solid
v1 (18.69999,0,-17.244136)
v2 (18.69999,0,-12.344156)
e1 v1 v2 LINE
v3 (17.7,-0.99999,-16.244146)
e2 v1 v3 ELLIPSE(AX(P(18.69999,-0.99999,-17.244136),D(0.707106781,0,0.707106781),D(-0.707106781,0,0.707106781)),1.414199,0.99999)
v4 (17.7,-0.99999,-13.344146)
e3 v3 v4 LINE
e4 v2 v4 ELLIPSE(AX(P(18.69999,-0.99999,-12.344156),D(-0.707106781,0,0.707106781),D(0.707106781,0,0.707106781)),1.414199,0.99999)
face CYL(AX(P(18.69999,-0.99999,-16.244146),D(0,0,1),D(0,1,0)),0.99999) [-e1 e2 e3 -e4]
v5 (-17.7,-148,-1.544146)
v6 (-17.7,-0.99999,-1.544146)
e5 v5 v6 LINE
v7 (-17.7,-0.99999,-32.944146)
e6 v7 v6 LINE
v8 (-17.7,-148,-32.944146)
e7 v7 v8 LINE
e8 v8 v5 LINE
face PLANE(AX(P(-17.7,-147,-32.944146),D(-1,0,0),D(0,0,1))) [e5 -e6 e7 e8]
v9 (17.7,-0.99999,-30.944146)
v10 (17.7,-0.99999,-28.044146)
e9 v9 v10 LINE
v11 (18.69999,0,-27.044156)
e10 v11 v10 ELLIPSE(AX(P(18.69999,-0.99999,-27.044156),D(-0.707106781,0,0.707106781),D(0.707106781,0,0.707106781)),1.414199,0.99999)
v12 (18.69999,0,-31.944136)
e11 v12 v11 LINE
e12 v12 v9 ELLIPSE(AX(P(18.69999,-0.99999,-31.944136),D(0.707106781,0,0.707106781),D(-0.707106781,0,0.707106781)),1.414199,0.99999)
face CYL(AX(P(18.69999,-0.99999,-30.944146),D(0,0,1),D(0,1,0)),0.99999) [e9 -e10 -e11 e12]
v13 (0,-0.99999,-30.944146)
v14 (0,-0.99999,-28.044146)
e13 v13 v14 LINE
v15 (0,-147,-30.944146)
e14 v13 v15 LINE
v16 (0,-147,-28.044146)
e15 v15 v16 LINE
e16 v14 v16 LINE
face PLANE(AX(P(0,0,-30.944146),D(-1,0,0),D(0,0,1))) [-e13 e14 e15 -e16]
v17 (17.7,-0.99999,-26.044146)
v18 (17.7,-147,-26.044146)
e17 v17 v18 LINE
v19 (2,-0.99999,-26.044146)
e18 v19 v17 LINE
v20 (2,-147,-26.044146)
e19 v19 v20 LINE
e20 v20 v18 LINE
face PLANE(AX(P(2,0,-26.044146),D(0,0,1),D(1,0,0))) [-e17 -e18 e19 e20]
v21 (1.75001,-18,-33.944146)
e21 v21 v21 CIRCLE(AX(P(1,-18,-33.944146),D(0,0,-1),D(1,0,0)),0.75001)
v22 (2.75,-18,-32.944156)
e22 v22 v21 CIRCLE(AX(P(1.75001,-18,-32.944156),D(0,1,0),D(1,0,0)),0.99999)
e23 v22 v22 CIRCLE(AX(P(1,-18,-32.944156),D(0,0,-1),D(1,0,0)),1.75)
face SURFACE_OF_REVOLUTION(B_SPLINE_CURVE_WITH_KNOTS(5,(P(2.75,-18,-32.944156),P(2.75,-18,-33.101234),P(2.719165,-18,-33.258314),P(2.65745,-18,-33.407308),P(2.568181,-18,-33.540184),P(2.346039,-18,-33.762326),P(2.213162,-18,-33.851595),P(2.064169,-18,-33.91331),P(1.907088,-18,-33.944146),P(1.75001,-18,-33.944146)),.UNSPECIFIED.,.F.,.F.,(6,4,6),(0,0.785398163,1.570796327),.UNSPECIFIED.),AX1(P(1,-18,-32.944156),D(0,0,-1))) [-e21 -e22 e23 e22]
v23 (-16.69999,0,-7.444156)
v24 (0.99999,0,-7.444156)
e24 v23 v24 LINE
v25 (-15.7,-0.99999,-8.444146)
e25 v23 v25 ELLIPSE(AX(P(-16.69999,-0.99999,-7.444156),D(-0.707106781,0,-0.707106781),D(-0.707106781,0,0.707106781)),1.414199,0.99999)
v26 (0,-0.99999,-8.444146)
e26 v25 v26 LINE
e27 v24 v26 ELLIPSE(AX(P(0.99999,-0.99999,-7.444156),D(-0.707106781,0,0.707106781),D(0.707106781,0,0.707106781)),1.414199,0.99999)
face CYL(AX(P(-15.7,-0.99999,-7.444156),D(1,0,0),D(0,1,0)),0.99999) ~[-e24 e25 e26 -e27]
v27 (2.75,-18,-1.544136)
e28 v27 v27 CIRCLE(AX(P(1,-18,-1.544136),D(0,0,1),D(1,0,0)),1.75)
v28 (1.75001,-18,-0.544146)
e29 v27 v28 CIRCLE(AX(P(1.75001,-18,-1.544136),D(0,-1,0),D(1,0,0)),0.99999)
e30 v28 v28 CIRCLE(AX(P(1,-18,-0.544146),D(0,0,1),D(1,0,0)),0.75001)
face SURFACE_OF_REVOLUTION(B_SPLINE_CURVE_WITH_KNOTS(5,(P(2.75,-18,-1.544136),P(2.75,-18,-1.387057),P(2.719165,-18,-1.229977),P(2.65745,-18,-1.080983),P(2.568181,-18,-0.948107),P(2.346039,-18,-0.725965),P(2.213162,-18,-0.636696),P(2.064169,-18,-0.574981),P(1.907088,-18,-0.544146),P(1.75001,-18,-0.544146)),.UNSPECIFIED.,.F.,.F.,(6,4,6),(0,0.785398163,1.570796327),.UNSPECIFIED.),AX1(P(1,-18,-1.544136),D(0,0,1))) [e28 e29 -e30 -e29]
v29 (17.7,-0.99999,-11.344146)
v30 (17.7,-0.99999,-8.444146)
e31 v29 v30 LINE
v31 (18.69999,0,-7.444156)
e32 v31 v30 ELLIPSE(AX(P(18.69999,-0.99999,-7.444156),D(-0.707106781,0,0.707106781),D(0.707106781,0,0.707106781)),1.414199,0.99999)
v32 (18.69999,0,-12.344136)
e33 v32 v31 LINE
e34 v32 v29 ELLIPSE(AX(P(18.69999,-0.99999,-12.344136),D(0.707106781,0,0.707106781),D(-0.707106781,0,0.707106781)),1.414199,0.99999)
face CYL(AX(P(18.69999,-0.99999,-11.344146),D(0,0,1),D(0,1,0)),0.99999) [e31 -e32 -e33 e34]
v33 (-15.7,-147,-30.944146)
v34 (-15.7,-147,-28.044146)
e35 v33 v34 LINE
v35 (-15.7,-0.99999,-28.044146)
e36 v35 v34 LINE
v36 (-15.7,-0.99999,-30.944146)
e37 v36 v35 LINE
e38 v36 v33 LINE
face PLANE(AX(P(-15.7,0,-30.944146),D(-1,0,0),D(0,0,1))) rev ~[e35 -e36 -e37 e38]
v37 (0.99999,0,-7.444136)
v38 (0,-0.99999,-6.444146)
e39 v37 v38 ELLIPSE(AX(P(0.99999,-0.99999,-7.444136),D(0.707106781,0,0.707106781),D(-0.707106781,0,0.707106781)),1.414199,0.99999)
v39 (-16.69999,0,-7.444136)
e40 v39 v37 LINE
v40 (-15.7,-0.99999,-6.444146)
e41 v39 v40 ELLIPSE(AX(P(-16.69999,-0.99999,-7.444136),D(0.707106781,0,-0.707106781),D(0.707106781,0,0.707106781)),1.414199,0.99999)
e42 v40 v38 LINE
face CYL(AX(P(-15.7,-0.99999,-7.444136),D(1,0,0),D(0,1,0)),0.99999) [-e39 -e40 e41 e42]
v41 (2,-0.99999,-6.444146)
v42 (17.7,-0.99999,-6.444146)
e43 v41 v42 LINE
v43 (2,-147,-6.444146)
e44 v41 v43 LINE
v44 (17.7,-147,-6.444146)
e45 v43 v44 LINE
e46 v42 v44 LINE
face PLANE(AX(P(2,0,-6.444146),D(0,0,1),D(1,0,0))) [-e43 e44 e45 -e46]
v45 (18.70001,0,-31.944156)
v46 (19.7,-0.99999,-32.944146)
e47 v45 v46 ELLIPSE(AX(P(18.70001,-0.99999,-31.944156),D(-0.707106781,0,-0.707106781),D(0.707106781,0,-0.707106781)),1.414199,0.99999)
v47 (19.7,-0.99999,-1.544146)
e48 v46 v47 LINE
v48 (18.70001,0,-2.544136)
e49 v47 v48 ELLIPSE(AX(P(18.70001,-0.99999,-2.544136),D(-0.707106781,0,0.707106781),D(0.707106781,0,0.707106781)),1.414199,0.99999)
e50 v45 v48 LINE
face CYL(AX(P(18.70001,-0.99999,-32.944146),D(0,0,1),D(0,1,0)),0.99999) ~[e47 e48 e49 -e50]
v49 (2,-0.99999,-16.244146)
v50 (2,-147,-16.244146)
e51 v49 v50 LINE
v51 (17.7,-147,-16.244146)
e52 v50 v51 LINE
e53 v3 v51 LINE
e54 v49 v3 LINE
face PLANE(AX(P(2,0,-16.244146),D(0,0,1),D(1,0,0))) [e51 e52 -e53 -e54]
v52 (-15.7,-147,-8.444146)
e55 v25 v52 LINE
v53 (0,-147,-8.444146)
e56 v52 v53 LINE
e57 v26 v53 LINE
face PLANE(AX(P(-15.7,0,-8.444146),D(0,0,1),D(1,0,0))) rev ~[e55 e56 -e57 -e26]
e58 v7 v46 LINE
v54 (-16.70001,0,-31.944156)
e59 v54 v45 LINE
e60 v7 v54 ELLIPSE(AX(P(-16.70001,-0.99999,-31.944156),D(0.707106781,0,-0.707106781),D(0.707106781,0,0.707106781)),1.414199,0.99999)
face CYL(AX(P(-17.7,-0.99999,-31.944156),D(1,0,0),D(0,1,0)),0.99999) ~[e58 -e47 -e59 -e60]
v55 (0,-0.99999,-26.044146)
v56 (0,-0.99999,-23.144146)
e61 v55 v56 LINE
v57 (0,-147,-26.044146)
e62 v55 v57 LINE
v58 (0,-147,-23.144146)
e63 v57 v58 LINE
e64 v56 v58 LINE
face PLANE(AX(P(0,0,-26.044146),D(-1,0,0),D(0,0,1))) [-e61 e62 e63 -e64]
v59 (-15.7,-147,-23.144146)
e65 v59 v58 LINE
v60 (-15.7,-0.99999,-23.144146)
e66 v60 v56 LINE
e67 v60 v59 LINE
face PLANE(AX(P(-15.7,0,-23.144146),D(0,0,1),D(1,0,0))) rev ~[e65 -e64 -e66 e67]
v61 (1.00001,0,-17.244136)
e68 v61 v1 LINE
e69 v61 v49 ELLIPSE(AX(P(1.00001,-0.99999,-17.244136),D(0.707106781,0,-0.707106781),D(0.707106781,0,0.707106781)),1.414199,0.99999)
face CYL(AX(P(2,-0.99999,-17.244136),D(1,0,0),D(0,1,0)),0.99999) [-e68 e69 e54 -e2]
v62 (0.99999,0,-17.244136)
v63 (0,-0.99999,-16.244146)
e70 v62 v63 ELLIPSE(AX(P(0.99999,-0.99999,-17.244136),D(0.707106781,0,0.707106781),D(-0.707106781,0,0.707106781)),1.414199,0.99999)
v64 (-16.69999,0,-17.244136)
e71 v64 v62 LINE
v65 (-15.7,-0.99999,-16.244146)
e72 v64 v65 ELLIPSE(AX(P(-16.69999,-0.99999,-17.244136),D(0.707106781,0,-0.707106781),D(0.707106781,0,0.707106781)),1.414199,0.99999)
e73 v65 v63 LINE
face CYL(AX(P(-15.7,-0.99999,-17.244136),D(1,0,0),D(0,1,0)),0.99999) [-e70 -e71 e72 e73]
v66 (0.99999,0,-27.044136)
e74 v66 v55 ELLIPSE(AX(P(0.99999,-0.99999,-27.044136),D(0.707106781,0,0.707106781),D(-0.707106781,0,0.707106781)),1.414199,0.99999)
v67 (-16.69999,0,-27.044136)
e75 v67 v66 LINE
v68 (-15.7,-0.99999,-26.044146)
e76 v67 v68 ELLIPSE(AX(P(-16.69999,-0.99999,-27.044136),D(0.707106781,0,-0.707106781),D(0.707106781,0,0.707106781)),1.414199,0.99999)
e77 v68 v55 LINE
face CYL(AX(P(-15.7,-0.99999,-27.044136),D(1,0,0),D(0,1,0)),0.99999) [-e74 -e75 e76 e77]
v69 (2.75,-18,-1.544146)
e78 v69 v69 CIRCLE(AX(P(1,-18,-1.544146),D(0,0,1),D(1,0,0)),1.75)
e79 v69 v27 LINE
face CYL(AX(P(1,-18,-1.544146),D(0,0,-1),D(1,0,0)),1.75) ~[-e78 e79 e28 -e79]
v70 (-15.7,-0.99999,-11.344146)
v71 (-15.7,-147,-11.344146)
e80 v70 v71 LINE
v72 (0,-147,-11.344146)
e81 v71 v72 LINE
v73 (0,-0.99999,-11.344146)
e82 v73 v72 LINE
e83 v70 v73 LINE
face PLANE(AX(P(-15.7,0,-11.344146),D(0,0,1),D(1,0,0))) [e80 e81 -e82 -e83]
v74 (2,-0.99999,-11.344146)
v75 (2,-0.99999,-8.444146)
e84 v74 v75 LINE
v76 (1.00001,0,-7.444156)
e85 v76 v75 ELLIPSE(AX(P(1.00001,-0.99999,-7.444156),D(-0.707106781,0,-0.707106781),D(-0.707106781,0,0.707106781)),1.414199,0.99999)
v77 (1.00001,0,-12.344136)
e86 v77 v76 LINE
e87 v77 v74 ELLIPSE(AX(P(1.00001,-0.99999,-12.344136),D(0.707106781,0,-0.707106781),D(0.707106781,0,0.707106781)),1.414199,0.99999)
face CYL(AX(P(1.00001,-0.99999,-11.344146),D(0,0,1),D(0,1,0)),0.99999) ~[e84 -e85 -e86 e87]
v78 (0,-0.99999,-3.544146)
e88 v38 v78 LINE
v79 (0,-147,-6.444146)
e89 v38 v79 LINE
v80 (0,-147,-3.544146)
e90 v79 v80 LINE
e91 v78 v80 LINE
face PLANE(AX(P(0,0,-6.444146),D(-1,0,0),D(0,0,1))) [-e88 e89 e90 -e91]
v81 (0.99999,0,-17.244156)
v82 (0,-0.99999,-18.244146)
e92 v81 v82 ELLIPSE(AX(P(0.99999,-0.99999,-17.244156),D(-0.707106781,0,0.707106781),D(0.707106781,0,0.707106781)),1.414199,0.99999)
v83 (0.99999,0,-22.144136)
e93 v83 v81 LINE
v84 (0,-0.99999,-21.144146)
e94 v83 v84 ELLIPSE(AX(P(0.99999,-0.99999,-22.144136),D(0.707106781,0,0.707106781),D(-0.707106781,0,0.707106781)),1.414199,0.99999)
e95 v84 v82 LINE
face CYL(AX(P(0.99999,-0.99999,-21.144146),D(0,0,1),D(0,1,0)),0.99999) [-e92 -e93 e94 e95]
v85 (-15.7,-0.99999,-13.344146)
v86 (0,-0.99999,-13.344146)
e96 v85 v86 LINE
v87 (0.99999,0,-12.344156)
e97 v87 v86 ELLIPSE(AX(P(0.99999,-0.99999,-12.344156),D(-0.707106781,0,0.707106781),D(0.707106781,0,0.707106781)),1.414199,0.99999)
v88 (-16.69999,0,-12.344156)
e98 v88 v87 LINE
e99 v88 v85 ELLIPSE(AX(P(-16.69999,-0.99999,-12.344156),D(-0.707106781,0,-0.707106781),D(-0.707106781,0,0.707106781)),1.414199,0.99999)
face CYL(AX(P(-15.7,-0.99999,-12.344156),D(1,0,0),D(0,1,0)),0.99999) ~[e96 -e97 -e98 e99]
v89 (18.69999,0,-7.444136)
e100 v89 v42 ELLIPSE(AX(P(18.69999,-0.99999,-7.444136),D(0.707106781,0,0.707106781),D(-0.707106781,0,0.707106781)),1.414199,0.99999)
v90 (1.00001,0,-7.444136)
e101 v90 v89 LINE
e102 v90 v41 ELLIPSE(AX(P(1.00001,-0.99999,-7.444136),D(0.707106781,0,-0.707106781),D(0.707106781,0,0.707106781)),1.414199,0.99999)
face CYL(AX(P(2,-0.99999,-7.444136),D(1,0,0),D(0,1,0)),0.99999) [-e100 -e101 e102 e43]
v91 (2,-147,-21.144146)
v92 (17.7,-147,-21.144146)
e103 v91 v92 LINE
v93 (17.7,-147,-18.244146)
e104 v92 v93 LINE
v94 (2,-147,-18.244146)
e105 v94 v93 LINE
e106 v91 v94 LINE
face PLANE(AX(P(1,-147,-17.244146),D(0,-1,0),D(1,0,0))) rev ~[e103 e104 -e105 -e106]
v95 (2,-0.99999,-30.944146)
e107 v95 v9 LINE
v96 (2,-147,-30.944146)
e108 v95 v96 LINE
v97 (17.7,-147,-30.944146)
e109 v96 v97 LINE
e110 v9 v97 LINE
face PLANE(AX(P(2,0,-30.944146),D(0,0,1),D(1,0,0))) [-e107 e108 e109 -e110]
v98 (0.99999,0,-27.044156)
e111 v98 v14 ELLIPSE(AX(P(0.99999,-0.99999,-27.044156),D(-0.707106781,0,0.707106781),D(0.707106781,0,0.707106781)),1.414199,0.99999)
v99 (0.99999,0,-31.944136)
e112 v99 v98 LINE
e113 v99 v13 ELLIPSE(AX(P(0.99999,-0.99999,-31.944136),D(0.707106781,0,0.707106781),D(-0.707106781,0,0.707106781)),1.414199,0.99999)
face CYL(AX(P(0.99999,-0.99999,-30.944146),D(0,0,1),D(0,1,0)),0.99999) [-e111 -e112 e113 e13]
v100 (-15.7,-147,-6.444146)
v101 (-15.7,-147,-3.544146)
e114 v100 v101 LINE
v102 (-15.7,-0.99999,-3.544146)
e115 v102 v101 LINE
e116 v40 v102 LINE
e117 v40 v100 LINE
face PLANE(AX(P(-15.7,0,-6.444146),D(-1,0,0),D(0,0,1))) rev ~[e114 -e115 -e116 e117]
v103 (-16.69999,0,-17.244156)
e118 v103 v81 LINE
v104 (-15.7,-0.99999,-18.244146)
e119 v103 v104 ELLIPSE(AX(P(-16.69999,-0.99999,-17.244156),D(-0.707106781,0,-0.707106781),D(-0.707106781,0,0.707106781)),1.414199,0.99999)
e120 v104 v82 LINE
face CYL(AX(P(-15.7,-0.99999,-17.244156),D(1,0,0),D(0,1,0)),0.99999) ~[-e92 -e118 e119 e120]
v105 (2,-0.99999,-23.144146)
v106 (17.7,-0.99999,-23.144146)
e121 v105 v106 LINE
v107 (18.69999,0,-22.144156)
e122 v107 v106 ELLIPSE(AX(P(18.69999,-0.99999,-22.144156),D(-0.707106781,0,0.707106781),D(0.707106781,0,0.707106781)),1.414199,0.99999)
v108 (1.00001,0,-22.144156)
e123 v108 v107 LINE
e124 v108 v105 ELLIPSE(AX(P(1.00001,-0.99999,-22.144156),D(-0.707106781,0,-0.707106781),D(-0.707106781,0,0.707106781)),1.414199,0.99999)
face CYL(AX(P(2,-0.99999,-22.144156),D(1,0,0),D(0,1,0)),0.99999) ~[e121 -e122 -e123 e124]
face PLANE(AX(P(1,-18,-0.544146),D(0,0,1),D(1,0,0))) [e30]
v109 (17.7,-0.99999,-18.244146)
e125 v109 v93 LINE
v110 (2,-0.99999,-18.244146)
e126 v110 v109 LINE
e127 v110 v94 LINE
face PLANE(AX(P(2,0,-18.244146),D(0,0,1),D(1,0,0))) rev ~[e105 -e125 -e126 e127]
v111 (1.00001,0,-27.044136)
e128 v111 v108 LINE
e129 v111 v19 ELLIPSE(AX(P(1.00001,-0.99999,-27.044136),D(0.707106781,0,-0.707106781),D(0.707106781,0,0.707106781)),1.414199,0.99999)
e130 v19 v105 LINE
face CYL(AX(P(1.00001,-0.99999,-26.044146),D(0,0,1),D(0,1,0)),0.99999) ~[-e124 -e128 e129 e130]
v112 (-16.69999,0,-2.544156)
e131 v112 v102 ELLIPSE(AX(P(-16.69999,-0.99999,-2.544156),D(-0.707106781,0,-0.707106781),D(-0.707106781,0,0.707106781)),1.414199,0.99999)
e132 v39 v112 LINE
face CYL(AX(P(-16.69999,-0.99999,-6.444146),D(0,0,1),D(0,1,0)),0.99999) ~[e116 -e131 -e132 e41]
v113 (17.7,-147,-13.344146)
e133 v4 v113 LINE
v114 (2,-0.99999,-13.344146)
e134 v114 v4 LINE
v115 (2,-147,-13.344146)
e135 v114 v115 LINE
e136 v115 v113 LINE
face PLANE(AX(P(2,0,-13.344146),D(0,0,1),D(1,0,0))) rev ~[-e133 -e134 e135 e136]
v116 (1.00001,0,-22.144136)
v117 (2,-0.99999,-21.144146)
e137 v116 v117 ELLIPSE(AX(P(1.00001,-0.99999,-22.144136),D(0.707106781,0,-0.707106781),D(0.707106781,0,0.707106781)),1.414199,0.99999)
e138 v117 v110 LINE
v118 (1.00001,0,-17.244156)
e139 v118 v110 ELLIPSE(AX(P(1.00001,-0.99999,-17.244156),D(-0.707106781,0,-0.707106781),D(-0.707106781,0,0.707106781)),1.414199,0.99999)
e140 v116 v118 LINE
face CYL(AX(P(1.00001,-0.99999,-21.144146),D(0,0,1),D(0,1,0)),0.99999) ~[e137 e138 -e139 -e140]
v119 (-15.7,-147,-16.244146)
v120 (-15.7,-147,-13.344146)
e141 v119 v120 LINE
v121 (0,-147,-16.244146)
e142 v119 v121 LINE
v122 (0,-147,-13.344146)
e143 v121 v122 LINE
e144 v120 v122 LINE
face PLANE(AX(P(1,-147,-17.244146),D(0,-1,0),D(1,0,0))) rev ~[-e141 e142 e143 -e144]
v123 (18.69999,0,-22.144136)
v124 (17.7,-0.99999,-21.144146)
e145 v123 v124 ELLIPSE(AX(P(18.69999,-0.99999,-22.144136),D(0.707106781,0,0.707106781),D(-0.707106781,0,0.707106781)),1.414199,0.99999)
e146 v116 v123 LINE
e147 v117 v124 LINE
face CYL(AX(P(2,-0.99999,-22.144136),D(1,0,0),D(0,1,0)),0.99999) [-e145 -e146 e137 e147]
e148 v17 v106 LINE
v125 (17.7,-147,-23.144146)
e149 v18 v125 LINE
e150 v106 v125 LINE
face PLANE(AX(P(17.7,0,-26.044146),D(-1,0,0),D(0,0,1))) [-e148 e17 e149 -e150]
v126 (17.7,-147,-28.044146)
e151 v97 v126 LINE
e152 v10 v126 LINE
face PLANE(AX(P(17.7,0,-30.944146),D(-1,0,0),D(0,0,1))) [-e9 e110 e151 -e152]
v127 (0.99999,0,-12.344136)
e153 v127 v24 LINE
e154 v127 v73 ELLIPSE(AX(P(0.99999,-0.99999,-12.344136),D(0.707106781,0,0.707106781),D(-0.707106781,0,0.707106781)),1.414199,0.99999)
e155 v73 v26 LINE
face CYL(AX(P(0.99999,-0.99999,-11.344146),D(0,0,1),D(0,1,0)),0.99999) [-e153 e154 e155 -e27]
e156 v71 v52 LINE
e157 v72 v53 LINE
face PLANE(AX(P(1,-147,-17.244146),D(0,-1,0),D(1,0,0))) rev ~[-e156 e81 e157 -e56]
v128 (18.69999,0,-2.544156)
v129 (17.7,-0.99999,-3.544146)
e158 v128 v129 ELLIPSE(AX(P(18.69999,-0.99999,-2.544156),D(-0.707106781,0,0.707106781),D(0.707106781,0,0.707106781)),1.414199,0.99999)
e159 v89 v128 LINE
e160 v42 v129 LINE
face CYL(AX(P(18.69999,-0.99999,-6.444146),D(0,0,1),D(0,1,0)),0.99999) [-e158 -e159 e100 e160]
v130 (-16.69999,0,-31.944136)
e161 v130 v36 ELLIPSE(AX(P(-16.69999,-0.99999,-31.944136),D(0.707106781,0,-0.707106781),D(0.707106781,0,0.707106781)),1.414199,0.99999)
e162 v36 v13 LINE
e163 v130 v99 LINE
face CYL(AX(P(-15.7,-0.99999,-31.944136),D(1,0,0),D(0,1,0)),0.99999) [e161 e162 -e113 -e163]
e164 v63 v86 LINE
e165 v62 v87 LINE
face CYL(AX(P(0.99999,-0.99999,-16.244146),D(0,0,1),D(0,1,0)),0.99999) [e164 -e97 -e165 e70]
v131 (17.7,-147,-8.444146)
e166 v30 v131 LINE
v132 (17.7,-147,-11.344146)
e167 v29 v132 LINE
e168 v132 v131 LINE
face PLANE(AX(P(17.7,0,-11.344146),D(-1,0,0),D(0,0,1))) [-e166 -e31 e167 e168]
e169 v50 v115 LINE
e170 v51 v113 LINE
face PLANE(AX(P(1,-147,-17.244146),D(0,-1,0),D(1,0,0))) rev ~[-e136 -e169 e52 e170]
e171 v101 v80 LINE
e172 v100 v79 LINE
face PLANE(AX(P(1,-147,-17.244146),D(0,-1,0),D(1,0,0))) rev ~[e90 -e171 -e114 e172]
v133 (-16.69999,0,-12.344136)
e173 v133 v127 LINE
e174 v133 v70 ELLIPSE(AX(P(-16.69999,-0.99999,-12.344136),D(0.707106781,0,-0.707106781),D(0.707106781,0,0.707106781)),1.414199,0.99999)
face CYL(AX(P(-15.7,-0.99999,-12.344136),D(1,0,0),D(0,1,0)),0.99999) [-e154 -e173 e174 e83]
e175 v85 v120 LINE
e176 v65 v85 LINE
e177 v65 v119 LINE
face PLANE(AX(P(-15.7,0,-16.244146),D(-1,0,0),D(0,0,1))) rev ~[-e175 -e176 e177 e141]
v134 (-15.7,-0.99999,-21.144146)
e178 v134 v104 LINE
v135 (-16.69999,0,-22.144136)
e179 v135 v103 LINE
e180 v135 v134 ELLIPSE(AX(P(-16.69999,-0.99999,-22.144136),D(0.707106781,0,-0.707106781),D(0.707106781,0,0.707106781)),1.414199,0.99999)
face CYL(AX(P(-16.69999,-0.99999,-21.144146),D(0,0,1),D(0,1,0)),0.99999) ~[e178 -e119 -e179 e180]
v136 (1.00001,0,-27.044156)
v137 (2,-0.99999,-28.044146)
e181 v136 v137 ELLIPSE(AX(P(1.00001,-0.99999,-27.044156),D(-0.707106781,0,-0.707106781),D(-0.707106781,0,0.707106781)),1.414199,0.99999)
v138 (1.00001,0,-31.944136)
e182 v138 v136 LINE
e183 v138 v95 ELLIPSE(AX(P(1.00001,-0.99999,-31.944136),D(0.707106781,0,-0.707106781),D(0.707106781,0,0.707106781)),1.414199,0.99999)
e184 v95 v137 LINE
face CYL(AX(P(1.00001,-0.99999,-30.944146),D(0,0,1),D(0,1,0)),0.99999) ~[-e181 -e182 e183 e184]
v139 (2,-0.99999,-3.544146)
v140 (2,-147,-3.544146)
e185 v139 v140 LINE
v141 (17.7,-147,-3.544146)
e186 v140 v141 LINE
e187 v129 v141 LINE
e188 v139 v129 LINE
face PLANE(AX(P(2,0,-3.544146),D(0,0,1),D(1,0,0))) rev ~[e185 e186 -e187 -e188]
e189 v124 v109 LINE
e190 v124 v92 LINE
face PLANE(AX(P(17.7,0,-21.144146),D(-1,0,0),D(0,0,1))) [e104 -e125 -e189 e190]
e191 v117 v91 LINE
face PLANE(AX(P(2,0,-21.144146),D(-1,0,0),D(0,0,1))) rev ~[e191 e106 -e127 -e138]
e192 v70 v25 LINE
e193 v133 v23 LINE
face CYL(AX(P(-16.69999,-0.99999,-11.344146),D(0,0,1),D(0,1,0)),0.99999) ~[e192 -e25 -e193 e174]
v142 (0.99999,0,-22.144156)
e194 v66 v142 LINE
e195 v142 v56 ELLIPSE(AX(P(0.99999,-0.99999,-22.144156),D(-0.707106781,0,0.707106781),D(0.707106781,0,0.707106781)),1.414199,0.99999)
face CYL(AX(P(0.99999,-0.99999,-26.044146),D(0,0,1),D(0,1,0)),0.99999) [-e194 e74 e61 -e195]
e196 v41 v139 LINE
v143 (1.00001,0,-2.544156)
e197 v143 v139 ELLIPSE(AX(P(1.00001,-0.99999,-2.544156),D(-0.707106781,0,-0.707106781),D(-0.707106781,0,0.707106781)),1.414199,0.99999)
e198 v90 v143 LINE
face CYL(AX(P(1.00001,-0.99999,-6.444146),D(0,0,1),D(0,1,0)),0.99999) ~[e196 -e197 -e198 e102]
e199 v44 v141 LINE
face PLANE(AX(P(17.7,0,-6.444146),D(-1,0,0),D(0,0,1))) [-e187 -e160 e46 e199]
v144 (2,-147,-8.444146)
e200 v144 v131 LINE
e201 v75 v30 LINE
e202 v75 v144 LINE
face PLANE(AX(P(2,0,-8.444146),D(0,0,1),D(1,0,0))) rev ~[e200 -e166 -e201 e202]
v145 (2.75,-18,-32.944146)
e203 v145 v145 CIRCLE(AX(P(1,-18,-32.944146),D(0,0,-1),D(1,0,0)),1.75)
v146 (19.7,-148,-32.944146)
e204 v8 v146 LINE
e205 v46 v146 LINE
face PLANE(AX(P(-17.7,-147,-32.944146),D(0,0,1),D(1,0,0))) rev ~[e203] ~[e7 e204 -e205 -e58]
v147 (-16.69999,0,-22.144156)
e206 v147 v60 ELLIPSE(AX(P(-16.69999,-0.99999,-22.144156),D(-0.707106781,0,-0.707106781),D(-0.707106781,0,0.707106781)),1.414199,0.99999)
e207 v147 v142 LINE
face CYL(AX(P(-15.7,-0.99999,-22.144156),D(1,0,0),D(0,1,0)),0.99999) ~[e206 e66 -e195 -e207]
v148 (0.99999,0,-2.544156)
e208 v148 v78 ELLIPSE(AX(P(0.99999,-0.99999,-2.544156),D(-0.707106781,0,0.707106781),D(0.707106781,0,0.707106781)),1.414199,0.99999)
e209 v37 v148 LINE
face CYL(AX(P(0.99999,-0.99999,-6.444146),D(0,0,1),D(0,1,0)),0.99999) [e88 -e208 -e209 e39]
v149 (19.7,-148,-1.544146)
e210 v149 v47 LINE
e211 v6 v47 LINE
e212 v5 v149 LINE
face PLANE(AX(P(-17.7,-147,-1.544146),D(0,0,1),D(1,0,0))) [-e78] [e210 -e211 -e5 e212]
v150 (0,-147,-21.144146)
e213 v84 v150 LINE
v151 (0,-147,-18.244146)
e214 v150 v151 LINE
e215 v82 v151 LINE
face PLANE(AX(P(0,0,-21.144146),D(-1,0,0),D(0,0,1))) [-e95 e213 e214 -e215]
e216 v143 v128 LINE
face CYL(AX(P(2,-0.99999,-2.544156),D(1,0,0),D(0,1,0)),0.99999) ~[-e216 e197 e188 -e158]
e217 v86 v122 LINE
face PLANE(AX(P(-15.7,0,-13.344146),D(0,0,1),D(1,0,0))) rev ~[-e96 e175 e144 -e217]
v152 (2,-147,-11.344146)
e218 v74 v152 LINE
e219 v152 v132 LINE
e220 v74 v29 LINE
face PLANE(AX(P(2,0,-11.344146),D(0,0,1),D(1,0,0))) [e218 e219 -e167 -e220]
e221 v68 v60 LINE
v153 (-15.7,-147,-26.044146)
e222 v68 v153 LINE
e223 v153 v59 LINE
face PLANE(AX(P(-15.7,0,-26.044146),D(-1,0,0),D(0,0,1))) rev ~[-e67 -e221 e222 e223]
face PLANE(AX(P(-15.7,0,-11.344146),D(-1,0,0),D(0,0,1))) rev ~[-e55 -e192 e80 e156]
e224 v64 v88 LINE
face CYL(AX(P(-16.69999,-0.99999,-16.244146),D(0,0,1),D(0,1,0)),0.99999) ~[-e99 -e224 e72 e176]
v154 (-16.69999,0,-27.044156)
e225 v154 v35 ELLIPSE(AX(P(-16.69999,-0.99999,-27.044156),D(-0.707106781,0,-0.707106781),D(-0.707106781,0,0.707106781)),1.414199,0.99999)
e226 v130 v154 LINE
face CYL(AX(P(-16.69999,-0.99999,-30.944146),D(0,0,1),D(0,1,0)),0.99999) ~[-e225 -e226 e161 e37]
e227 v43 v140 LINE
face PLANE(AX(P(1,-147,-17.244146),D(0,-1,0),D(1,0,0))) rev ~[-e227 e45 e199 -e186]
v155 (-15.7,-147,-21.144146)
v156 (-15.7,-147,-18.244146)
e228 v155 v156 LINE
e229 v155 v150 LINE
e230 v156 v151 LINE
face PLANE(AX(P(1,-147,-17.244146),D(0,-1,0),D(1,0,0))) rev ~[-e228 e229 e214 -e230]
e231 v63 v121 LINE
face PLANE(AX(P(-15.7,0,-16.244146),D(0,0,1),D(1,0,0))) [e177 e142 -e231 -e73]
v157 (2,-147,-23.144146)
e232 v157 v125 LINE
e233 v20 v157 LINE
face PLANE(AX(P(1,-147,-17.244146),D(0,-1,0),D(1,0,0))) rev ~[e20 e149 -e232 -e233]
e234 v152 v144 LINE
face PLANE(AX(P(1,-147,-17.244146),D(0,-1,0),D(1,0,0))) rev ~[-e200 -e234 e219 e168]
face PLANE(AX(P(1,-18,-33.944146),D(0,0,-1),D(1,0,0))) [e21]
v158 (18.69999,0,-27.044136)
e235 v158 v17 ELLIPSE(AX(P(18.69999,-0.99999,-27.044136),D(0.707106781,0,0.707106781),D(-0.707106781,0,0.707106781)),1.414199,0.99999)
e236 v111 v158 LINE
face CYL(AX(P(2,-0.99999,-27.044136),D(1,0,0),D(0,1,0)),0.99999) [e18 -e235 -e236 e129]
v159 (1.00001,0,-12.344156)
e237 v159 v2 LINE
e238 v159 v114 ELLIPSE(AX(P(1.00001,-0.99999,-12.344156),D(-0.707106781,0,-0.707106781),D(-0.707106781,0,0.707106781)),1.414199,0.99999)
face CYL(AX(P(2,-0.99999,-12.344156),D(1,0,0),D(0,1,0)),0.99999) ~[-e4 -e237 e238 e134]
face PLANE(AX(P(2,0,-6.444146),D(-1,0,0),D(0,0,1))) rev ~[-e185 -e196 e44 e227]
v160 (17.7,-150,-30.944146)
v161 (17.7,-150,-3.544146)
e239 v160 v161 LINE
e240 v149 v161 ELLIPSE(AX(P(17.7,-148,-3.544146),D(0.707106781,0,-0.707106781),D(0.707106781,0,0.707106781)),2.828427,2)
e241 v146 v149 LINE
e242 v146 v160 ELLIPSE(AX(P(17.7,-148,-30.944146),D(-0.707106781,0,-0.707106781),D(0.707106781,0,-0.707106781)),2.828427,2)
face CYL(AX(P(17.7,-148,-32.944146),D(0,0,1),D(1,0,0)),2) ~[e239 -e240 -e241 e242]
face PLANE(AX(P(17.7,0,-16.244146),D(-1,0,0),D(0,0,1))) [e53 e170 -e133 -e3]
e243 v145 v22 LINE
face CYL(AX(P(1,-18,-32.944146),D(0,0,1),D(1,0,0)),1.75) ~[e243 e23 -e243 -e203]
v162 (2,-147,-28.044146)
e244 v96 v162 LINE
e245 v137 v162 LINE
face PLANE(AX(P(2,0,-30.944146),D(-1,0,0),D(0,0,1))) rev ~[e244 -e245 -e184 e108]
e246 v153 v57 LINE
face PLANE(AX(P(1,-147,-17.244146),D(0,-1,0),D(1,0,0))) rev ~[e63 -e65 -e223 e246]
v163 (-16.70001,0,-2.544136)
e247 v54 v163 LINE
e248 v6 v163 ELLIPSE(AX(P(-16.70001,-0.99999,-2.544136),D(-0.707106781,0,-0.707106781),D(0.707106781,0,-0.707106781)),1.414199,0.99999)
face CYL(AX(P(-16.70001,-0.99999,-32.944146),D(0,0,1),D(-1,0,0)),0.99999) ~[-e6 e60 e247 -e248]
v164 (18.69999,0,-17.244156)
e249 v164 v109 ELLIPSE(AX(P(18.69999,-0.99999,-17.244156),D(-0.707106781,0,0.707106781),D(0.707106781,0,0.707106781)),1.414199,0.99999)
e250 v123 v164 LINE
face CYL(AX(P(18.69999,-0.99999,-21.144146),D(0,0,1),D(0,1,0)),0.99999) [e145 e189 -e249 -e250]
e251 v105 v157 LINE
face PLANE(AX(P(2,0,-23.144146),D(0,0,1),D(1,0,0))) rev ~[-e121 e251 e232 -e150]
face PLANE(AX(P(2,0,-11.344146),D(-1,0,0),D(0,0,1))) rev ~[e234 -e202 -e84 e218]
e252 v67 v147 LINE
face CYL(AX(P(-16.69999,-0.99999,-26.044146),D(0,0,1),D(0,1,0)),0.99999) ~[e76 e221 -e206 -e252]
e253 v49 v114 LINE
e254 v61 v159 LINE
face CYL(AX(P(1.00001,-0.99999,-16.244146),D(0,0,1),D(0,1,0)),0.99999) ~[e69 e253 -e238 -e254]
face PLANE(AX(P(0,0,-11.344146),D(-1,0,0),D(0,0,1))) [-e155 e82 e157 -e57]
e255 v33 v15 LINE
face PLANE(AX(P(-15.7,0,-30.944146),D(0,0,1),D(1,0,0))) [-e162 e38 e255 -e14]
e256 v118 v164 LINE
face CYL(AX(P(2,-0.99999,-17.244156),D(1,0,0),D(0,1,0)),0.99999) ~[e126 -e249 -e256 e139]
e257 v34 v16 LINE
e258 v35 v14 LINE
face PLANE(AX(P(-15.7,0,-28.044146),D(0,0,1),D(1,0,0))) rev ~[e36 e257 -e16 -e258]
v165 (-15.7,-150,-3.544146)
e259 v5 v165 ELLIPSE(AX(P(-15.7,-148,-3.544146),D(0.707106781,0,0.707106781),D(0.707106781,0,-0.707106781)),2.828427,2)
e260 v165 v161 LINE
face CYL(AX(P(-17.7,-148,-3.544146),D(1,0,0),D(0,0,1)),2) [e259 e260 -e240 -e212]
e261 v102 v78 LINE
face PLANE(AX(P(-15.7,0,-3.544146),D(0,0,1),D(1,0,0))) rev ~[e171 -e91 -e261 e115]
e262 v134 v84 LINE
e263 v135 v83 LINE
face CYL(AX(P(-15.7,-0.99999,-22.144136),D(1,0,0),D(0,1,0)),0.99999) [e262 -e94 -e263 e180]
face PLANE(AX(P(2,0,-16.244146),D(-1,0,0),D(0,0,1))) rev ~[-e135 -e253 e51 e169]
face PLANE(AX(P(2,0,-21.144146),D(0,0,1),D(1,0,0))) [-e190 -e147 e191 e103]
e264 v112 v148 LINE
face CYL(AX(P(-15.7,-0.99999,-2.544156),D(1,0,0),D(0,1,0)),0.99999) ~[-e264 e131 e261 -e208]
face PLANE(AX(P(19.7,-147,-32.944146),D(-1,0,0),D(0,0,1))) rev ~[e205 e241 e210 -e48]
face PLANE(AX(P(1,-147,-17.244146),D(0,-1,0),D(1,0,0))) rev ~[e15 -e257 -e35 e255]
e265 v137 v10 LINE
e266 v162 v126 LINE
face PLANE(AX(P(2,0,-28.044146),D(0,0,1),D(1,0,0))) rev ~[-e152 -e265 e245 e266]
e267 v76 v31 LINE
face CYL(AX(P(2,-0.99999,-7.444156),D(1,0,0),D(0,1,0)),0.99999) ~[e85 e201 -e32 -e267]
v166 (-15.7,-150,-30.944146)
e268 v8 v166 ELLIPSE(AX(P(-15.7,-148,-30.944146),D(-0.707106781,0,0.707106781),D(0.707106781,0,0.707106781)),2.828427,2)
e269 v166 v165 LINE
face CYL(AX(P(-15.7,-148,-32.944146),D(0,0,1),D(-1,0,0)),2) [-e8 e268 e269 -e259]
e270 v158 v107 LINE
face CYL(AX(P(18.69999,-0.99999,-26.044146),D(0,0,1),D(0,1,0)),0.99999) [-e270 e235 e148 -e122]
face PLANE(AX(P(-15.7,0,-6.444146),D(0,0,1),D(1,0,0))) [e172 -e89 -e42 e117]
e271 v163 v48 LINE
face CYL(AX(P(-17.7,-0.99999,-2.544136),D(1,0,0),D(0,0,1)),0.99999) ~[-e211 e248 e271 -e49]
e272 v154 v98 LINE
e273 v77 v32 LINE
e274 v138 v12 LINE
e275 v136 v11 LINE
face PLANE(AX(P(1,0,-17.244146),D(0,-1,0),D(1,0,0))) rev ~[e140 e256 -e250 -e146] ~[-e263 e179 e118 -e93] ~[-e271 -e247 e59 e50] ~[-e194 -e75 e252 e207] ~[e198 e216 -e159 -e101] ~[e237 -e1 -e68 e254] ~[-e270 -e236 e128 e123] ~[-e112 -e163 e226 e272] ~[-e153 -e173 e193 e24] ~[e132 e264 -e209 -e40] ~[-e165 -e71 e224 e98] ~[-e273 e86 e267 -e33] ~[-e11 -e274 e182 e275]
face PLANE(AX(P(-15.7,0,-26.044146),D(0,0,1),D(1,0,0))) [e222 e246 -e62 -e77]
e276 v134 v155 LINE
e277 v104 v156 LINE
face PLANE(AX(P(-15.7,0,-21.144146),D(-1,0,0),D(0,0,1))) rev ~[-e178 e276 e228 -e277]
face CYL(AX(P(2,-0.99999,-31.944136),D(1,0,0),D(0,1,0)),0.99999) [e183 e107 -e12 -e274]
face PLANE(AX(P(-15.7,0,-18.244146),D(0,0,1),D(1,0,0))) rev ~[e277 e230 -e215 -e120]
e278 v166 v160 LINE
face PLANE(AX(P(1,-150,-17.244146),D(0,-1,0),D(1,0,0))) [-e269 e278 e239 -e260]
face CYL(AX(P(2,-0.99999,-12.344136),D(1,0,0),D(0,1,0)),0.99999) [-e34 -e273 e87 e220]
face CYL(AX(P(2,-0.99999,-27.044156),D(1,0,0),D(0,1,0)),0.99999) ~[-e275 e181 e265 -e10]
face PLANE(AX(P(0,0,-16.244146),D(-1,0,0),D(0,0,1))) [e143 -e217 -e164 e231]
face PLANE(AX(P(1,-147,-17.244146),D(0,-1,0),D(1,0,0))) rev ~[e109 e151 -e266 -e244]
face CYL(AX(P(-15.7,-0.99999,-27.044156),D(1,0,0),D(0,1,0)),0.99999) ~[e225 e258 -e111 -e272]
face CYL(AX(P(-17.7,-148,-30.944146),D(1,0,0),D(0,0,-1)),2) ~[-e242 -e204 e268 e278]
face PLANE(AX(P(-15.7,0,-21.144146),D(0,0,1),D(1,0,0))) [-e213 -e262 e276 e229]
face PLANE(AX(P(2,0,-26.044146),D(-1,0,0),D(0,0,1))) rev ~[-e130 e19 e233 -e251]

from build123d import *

# Parameters (mm, degrees)
F0_W      = 37.4
F0_H      = 31.4
F0_W_2    = 15.7
F0_H_2    = 2.9
F1_DEPTH  = 147
F2_W      = 37.4
F2_H      = 31.4
F3_DEPTH  = 3
F4_R      = 2
F5_R      = 0.99999
F7_R      = 1.75
F8_DEPTH  = 1
F9_R      = 0.99999
F11_R     = 1.75
F12_DEPTH = 1
F13_R     = 0.99999


# Not quite as in the source:
# - a fillet or chamfer is up to 0.001 mm smaller than in the source, because OpenCascade refuses the exact size


with BuildPart() as f1:
    # F0 (on Front) → F1 (new body)
    with BuildSketch(Plane.XZ):
        with Locations((1, -17.2441455504)):
            Rectangle(F0_W, F0_H)
        with Locations((-7.85, -29.4941455504)):
            Rectangle(F0_W_2, F0_H_2, mode=Mode.SUBTRACT)
        with Locations((-7.85, -24.5941455504)):
            Rectangle(F0_W_2, F0_H_2, mode=Mode.SUBTRACT)
        with Locations((-7.85, -19.6941455504)):
            Rectangle(F0_W_2, F0_H_2, mode=Mode.SUBTRACT)
        with Locations((9.85, -29.4941455504)):
            Rectangle(F0_W_2, F0_H_2, mode=Mode.SUBTRACT)
        with Locations((9.85, -24.5941455504)):
            Rectangle(F0_W_2, F0_H_2, mode=Mode.SUBTRACT)
        with Locations((9.85, -19.6941455504)):
            Rectangle(F0_W_2, F0_H_2, mode=Mode.SUBTRACT)
        with Locations((-7.85, -14.7941455504)):
            Rectangle(F0_W_2, F0_H_2, mode=Mode.SUBTRACT)
        with Locations((-7.85, -9.8941455504)):
            Rectangle(F0_W_2, F0_H_2, mode=Mode.SUBTRACT)
        with Locations((-7.85, -4.9941455504)):
            Rectangle(F0_W_2, F0_H_2, mode=Mode.SUBTRACT)
        with Locations((9.85, -14.7941455504)):
            Rectangle(F0_W_2, F0_H_2, mode=Mode.SUBTRACT)
        with Locations((9.85, -9.8941455504)):
            Rectangle(F0_W_2, F0_H_2, mode=Mode.SUBTRACT)
        with Locations((9.85, -4.9941455504)):
            Rectangle(F0_W_2, F0_H_2, mode=Mode.SUBTRACT)
    extrude(amount=F1_DEPTH)

    # F2 (on face) → F3 (join)
    with BuildSketch(Plane.XZ.offset(147)):
        with Locations((1, -17.2441455504)):
            Rectangle(F2_W, F2_H)
    extrude(amount=F3_DEPTH)

    # F4
    f4_edges = [f1.edges().sort_by_distance(p)[0] for p in [
        (1, -150, -1.544146),
        (-17.7, -150, -17.244146),
        (1, -150, -32.944146),
        (19.7, -150, -17.244146),
    ]]
    fillet(f4_edges, radius=F4_R)

    # F5 (radius 1 in the source; OpenCascade refuses exactly that, so slightly less here)
    f5_edges = [f1.edges().sort_by_distance(p)[0] for p in [
        (1, 0, -1.544146),
        (-17.7, 0, -17.244146),
        (1, 0, -32.944146),
        (19.7, 0, -17.244146),
        (-15.7, 0, -29.494146),
        (-7.85, 0, -28.044146),
        (0, 0, -29.494146),
        (-7.85, 0, -30.944146),
        (-15.7, 0, -24.594146),
        (-7.85, 0, -23.144146),
        (0, 0, -24.594146),
        (-7.85, 0, -26.044146),
        (-15.7, 0, -19.694146),
        (-7.85, 0, -18.244146),
        (0, 0, -19.694146),
        (-7.85, 0, -21.144146),
        (2, 0, -29.494146),
        (9.85, 0, -28.044146),
        (17.7, 0, -29.494146),
        (9.85, 0, -30.944146),
        (2, 0, -24.594146),
        (9.85, 0, -23.144146),
        (17.7, 0, -24.594146),
        (9.85, 0, -26.044146),
        (2, 0, -19.694146),
        (9.85, 0, -18.244146),
        (17.7, 0, -19.694146),
        (9.85, 0, -21.144146),
        (-15.7, 0, -14.794146),
        (-7.85, 0, -13.344146),
        (0, 0, -14.794146),
        (-7.85, 0, -16.244146),
        (-15.7, 0, -9.894146),
        (-7.85, 0, -8.444146),
        (0, 0, -9.894146),
        (-7.85, 0, -11.344146),
        (-15.7, 0, -4.994146),
        (-7.85, 0, -3.544146),
        (0, 0, -4.994146),
        (-7.85, 0, -6.444146),
        (2, 0, -14.794146),
        (9.85, 0, -13.344146),
        (17.7, 0, -14.794146),
        (9.85, 0, -16.244146),
        (2, 0, -9.894146),
        (9.85, 0, -8.444146),
        (17.7, 0, -9.894146),
        (9.85, 0, -11.344146),
        (2, 0, -4.994146),
        (9.85, 0, -3.544146),
        (17.7, 0, -4.994146),
        (9.85, 0, -6.444146),
    ]]
    fillet(f5_edges, radius=F5_R)

    # F7 (on face) → F8 (join)
    with BuildSketch(Plane.XY.offset(-1.5441455504)):
        with Locations((1, -18)):
            Circle(F7_R)
    extrude(amount=F8_DEPTH)

    # F9 (radius 1 in the source; OpenCascade refuses exactly that, so slightly less here)
    f9_edges = [f1.edges().sort_by_distance(p)[0] for p in [
        (-0.75, -18, -0.544146),
    ]]
    fillet(f9_edges, radius=F9_R)

    # F11 (on face) → F12 (join)
    with BuildSketch(Plane(origin=(0, 0, -32.9441455504), x_dir=(1, 0, 0), z_dir=(0, 0, -1))):
        with Locations((1, 18)):
            Circle(F11_R)
    extrude(amount=F12_DEPTH)

    # F13 (radius 1 in the source; OpenCascade refuses exactly that, so slightly less here)
    f13_edges = [f1.edges().sort_by_distance(p)[0] for p in [
        (-0.75, -18, -33.944146),
    ]]
    fillet(f13_edges, radius=F13_R)


solid = f1.part
